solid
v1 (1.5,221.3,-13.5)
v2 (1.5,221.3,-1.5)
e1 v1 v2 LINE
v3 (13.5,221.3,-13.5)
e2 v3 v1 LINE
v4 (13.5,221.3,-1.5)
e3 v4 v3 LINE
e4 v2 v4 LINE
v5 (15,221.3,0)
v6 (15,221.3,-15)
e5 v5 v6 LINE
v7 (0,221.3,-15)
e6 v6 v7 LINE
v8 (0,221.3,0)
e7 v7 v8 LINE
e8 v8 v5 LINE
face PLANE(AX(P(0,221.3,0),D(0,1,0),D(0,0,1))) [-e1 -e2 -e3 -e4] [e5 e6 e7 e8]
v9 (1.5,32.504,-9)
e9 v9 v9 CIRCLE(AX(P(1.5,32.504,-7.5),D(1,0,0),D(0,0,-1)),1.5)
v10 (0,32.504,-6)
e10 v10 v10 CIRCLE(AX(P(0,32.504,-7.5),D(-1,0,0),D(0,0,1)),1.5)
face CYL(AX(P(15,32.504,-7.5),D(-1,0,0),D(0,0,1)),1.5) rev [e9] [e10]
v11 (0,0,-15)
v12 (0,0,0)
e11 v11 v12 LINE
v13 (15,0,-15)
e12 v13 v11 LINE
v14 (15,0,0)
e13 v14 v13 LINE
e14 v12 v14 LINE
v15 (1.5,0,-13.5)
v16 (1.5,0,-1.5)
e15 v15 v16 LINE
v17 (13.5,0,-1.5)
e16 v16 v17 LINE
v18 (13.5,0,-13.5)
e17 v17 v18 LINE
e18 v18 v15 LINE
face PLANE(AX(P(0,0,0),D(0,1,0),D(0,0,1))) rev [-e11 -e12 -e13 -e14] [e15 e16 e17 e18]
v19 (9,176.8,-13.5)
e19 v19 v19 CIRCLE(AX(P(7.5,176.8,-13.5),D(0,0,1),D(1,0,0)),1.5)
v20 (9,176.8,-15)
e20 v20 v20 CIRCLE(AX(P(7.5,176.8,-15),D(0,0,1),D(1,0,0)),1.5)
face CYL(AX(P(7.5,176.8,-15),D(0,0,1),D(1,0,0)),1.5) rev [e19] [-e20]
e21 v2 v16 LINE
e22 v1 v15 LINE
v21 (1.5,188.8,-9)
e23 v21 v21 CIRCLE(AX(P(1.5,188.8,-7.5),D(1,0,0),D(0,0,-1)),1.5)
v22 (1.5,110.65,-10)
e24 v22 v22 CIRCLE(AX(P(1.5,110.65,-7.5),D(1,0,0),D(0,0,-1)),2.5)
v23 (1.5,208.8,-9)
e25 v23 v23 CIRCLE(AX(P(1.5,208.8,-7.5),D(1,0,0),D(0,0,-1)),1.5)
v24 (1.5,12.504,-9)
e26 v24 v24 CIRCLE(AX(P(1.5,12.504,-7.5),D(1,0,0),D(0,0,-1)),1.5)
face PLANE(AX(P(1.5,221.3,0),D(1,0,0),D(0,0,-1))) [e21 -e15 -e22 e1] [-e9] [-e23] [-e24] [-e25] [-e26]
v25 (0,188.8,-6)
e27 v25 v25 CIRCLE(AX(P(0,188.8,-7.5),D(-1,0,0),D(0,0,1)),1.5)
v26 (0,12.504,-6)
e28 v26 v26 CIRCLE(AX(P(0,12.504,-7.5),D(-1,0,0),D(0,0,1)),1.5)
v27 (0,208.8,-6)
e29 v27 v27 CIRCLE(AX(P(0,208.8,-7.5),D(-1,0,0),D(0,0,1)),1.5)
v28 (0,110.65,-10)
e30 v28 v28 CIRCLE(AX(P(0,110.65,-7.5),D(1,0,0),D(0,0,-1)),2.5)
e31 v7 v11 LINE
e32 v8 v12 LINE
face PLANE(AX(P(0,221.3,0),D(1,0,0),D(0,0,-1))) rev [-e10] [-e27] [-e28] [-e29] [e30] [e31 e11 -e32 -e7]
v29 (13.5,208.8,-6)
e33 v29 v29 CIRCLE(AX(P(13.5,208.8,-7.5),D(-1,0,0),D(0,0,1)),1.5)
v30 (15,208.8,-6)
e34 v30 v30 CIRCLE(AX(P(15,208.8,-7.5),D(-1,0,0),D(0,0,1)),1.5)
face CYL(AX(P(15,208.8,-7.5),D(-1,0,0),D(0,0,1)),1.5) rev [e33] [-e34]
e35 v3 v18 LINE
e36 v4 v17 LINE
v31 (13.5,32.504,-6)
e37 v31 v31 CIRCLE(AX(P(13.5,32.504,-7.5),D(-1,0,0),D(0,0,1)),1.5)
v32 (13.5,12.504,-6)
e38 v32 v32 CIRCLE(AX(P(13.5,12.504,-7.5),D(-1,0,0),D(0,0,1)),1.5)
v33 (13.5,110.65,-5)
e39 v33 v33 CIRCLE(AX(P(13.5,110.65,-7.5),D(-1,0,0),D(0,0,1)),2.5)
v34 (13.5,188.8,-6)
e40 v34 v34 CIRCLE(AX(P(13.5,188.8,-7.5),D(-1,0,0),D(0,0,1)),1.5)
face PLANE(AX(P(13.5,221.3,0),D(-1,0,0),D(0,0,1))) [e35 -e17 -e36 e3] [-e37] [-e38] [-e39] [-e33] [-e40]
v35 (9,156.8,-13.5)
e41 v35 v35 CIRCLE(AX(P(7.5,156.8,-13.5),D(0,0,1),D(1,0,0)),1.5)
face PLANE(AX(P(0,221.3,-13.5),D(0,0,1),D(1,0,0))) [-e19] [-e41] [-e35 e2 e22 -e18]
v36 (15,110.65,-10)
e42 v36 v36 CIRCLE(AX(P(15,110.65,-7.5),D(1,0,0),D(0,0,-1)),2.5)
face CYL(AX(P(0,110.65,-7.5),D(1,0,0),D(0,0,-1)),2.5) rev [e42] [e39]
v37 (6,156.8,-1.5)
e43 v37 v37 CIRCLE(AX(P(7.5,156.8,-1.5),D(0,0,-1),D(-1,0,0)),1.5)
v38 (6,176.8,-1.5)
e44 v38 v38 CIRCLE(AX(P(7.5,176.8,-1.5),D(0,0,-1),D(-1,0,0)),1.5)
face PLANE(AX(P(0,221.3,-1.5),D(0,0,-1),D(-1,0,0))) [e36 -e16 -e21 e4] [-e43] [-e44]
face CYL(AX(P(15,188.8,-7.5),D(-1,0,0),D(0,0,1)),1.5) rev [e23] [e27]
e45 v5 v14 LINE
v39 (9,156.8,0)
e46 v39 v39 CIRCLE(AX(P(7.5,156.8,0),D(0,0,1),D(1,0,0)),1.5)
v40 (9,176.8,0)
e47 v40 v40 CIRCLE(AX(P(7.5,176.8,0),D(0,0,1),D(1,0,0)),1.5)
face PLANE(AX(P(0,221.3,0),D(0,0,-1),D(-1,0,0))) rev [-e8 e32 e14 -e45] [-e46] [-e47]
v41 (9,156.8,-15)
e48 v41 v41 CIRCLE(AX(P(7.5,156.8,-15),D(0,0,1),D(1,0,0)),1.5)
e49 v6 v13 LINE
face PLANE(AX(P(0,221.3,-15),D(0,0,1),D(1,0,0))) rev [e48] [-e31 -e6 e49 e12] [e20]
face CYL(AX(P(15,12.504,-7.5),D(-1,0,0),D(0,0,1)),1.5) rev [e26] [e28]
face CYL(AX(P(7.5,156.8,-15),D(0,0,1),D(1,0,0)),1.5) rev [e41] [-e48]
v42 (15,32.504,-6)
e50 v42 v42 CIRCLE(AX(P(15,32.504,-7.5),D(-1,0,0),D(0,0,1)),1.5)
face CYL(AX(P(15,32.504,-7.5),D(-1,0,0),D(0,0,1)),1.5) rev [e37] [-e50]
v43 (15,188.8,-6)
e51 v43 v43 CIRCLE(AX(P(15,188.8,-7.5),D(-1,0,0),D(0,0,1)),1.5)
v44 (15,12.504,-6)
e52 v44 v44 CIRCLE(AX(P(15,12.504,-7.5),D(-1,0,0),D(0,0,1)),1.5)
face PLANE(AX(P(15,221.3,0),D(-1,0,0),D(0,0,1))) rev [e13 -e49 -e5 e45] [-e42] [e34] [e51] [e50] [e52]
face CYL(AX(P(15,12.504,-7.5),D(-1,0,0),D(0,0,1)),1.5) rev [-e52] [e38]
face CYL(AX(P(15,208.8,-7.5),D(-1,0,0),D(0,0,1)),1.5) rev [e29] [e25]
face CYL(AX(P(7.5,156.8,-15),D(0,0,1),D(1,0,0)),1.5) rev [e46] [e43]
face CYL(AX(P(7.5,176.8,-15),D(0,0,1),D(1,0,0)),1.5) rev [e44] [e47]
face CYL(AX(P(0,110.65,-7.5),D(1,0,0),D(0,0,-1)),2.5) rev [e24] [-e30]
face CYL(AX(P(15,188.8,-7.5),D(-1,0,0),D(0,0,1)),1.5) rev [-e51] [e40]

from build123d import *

# Parameters (mm, degrees)
SKETCH1_W              = 15
SKETCH1_H              = 15
SKETCH1_W_2            = 12
SKETCH1_H_2            = 12
EXTRUDE_THIN1_DEPTH    = 221.3
CUT_EXTRUDE1_OUTLINE_R = 1.5
CUT_EXTRUDE1_DEPTH     = 15
SKETCH3_R              = 2.5
CUT_EXTRUDE2_DEPTH     = 223.314394496
SKETCH4_R              = 1.5
CUT_EXTRUDE3_DEPTH     = 223.314394496


# Read off the part's stored shape, not the designer's step: Cut-Extrude1
with BuildPart() as part:
    # Sketch1 → Extrude-Thin1 (new body)
    with BuildSketch(Plane(origin=(0, 0, 0), x_dir=(1, 0, 0), z_dir=(0, 1, 0))):
        with Locations((7.5, 7.5)):
            Rectangle(SKETCH1_W, SKETCH1_H)
        with Locations((7.5, 7.5)):
            Rectangle(SKETCH1_W_2, SKETCH1_H_2, mode=Mode.SUBTRACT)
    extrude(amount=EXTRUDE_THIN1_DEPTH)

    # Cut-Extrude1 outline → Cut-Extrude1 (cut)
    with BuildSketch(Plane.YZ):
        with Locations((12.504, -7.5)):
            Circle(CUT_EXTRUDE1_OUTLINE_R)
        with Locations((32.504, -7.5)):
            Circle(CUT_EXTRUDE1_OUTLINE_R)
        with Locations((188.8, -7.5)):
            Circle(CUT_EXTRUDE1_OUTLINE_R)
        with Locations((208.8, -7.5)):
            Circle(CUT_EXTRUDE1_OUTLINE_R)
    extrude(amount=CUT_EXTRUDE1_DEPTH, mode=Mode.SUBTRACT)

    # Sketch3 → Cut-Extrude2 (cut, through all)
    with BuildSketch(Plane(origin=(15, 0, 0), x_dir=(0, 0, -1), z_dir=(1, 0, 0))):
        with Locations((7.5, 110.65)):
            Circle(SKETCH3_R)
    extrude(amount=-CUT_EXTRUDE2_DEPTH, mode=Mode.SUBTRACT)

    # Sketch4 (on Front Plane) → Cut-Extrude3 (cut, through all)
    with BuildSketch(Plane.XY):
        with Locations((7.5, 156.8)):
            Circle(SKETCH4_R)
        with Locations((7.5, 176.8)):
            Circle(SKETCH4_R)
    extrude(amount=-CUT_EXTRUDE3_DEPTH, mode=Mode.SUBTRACT)


solid = part.part
